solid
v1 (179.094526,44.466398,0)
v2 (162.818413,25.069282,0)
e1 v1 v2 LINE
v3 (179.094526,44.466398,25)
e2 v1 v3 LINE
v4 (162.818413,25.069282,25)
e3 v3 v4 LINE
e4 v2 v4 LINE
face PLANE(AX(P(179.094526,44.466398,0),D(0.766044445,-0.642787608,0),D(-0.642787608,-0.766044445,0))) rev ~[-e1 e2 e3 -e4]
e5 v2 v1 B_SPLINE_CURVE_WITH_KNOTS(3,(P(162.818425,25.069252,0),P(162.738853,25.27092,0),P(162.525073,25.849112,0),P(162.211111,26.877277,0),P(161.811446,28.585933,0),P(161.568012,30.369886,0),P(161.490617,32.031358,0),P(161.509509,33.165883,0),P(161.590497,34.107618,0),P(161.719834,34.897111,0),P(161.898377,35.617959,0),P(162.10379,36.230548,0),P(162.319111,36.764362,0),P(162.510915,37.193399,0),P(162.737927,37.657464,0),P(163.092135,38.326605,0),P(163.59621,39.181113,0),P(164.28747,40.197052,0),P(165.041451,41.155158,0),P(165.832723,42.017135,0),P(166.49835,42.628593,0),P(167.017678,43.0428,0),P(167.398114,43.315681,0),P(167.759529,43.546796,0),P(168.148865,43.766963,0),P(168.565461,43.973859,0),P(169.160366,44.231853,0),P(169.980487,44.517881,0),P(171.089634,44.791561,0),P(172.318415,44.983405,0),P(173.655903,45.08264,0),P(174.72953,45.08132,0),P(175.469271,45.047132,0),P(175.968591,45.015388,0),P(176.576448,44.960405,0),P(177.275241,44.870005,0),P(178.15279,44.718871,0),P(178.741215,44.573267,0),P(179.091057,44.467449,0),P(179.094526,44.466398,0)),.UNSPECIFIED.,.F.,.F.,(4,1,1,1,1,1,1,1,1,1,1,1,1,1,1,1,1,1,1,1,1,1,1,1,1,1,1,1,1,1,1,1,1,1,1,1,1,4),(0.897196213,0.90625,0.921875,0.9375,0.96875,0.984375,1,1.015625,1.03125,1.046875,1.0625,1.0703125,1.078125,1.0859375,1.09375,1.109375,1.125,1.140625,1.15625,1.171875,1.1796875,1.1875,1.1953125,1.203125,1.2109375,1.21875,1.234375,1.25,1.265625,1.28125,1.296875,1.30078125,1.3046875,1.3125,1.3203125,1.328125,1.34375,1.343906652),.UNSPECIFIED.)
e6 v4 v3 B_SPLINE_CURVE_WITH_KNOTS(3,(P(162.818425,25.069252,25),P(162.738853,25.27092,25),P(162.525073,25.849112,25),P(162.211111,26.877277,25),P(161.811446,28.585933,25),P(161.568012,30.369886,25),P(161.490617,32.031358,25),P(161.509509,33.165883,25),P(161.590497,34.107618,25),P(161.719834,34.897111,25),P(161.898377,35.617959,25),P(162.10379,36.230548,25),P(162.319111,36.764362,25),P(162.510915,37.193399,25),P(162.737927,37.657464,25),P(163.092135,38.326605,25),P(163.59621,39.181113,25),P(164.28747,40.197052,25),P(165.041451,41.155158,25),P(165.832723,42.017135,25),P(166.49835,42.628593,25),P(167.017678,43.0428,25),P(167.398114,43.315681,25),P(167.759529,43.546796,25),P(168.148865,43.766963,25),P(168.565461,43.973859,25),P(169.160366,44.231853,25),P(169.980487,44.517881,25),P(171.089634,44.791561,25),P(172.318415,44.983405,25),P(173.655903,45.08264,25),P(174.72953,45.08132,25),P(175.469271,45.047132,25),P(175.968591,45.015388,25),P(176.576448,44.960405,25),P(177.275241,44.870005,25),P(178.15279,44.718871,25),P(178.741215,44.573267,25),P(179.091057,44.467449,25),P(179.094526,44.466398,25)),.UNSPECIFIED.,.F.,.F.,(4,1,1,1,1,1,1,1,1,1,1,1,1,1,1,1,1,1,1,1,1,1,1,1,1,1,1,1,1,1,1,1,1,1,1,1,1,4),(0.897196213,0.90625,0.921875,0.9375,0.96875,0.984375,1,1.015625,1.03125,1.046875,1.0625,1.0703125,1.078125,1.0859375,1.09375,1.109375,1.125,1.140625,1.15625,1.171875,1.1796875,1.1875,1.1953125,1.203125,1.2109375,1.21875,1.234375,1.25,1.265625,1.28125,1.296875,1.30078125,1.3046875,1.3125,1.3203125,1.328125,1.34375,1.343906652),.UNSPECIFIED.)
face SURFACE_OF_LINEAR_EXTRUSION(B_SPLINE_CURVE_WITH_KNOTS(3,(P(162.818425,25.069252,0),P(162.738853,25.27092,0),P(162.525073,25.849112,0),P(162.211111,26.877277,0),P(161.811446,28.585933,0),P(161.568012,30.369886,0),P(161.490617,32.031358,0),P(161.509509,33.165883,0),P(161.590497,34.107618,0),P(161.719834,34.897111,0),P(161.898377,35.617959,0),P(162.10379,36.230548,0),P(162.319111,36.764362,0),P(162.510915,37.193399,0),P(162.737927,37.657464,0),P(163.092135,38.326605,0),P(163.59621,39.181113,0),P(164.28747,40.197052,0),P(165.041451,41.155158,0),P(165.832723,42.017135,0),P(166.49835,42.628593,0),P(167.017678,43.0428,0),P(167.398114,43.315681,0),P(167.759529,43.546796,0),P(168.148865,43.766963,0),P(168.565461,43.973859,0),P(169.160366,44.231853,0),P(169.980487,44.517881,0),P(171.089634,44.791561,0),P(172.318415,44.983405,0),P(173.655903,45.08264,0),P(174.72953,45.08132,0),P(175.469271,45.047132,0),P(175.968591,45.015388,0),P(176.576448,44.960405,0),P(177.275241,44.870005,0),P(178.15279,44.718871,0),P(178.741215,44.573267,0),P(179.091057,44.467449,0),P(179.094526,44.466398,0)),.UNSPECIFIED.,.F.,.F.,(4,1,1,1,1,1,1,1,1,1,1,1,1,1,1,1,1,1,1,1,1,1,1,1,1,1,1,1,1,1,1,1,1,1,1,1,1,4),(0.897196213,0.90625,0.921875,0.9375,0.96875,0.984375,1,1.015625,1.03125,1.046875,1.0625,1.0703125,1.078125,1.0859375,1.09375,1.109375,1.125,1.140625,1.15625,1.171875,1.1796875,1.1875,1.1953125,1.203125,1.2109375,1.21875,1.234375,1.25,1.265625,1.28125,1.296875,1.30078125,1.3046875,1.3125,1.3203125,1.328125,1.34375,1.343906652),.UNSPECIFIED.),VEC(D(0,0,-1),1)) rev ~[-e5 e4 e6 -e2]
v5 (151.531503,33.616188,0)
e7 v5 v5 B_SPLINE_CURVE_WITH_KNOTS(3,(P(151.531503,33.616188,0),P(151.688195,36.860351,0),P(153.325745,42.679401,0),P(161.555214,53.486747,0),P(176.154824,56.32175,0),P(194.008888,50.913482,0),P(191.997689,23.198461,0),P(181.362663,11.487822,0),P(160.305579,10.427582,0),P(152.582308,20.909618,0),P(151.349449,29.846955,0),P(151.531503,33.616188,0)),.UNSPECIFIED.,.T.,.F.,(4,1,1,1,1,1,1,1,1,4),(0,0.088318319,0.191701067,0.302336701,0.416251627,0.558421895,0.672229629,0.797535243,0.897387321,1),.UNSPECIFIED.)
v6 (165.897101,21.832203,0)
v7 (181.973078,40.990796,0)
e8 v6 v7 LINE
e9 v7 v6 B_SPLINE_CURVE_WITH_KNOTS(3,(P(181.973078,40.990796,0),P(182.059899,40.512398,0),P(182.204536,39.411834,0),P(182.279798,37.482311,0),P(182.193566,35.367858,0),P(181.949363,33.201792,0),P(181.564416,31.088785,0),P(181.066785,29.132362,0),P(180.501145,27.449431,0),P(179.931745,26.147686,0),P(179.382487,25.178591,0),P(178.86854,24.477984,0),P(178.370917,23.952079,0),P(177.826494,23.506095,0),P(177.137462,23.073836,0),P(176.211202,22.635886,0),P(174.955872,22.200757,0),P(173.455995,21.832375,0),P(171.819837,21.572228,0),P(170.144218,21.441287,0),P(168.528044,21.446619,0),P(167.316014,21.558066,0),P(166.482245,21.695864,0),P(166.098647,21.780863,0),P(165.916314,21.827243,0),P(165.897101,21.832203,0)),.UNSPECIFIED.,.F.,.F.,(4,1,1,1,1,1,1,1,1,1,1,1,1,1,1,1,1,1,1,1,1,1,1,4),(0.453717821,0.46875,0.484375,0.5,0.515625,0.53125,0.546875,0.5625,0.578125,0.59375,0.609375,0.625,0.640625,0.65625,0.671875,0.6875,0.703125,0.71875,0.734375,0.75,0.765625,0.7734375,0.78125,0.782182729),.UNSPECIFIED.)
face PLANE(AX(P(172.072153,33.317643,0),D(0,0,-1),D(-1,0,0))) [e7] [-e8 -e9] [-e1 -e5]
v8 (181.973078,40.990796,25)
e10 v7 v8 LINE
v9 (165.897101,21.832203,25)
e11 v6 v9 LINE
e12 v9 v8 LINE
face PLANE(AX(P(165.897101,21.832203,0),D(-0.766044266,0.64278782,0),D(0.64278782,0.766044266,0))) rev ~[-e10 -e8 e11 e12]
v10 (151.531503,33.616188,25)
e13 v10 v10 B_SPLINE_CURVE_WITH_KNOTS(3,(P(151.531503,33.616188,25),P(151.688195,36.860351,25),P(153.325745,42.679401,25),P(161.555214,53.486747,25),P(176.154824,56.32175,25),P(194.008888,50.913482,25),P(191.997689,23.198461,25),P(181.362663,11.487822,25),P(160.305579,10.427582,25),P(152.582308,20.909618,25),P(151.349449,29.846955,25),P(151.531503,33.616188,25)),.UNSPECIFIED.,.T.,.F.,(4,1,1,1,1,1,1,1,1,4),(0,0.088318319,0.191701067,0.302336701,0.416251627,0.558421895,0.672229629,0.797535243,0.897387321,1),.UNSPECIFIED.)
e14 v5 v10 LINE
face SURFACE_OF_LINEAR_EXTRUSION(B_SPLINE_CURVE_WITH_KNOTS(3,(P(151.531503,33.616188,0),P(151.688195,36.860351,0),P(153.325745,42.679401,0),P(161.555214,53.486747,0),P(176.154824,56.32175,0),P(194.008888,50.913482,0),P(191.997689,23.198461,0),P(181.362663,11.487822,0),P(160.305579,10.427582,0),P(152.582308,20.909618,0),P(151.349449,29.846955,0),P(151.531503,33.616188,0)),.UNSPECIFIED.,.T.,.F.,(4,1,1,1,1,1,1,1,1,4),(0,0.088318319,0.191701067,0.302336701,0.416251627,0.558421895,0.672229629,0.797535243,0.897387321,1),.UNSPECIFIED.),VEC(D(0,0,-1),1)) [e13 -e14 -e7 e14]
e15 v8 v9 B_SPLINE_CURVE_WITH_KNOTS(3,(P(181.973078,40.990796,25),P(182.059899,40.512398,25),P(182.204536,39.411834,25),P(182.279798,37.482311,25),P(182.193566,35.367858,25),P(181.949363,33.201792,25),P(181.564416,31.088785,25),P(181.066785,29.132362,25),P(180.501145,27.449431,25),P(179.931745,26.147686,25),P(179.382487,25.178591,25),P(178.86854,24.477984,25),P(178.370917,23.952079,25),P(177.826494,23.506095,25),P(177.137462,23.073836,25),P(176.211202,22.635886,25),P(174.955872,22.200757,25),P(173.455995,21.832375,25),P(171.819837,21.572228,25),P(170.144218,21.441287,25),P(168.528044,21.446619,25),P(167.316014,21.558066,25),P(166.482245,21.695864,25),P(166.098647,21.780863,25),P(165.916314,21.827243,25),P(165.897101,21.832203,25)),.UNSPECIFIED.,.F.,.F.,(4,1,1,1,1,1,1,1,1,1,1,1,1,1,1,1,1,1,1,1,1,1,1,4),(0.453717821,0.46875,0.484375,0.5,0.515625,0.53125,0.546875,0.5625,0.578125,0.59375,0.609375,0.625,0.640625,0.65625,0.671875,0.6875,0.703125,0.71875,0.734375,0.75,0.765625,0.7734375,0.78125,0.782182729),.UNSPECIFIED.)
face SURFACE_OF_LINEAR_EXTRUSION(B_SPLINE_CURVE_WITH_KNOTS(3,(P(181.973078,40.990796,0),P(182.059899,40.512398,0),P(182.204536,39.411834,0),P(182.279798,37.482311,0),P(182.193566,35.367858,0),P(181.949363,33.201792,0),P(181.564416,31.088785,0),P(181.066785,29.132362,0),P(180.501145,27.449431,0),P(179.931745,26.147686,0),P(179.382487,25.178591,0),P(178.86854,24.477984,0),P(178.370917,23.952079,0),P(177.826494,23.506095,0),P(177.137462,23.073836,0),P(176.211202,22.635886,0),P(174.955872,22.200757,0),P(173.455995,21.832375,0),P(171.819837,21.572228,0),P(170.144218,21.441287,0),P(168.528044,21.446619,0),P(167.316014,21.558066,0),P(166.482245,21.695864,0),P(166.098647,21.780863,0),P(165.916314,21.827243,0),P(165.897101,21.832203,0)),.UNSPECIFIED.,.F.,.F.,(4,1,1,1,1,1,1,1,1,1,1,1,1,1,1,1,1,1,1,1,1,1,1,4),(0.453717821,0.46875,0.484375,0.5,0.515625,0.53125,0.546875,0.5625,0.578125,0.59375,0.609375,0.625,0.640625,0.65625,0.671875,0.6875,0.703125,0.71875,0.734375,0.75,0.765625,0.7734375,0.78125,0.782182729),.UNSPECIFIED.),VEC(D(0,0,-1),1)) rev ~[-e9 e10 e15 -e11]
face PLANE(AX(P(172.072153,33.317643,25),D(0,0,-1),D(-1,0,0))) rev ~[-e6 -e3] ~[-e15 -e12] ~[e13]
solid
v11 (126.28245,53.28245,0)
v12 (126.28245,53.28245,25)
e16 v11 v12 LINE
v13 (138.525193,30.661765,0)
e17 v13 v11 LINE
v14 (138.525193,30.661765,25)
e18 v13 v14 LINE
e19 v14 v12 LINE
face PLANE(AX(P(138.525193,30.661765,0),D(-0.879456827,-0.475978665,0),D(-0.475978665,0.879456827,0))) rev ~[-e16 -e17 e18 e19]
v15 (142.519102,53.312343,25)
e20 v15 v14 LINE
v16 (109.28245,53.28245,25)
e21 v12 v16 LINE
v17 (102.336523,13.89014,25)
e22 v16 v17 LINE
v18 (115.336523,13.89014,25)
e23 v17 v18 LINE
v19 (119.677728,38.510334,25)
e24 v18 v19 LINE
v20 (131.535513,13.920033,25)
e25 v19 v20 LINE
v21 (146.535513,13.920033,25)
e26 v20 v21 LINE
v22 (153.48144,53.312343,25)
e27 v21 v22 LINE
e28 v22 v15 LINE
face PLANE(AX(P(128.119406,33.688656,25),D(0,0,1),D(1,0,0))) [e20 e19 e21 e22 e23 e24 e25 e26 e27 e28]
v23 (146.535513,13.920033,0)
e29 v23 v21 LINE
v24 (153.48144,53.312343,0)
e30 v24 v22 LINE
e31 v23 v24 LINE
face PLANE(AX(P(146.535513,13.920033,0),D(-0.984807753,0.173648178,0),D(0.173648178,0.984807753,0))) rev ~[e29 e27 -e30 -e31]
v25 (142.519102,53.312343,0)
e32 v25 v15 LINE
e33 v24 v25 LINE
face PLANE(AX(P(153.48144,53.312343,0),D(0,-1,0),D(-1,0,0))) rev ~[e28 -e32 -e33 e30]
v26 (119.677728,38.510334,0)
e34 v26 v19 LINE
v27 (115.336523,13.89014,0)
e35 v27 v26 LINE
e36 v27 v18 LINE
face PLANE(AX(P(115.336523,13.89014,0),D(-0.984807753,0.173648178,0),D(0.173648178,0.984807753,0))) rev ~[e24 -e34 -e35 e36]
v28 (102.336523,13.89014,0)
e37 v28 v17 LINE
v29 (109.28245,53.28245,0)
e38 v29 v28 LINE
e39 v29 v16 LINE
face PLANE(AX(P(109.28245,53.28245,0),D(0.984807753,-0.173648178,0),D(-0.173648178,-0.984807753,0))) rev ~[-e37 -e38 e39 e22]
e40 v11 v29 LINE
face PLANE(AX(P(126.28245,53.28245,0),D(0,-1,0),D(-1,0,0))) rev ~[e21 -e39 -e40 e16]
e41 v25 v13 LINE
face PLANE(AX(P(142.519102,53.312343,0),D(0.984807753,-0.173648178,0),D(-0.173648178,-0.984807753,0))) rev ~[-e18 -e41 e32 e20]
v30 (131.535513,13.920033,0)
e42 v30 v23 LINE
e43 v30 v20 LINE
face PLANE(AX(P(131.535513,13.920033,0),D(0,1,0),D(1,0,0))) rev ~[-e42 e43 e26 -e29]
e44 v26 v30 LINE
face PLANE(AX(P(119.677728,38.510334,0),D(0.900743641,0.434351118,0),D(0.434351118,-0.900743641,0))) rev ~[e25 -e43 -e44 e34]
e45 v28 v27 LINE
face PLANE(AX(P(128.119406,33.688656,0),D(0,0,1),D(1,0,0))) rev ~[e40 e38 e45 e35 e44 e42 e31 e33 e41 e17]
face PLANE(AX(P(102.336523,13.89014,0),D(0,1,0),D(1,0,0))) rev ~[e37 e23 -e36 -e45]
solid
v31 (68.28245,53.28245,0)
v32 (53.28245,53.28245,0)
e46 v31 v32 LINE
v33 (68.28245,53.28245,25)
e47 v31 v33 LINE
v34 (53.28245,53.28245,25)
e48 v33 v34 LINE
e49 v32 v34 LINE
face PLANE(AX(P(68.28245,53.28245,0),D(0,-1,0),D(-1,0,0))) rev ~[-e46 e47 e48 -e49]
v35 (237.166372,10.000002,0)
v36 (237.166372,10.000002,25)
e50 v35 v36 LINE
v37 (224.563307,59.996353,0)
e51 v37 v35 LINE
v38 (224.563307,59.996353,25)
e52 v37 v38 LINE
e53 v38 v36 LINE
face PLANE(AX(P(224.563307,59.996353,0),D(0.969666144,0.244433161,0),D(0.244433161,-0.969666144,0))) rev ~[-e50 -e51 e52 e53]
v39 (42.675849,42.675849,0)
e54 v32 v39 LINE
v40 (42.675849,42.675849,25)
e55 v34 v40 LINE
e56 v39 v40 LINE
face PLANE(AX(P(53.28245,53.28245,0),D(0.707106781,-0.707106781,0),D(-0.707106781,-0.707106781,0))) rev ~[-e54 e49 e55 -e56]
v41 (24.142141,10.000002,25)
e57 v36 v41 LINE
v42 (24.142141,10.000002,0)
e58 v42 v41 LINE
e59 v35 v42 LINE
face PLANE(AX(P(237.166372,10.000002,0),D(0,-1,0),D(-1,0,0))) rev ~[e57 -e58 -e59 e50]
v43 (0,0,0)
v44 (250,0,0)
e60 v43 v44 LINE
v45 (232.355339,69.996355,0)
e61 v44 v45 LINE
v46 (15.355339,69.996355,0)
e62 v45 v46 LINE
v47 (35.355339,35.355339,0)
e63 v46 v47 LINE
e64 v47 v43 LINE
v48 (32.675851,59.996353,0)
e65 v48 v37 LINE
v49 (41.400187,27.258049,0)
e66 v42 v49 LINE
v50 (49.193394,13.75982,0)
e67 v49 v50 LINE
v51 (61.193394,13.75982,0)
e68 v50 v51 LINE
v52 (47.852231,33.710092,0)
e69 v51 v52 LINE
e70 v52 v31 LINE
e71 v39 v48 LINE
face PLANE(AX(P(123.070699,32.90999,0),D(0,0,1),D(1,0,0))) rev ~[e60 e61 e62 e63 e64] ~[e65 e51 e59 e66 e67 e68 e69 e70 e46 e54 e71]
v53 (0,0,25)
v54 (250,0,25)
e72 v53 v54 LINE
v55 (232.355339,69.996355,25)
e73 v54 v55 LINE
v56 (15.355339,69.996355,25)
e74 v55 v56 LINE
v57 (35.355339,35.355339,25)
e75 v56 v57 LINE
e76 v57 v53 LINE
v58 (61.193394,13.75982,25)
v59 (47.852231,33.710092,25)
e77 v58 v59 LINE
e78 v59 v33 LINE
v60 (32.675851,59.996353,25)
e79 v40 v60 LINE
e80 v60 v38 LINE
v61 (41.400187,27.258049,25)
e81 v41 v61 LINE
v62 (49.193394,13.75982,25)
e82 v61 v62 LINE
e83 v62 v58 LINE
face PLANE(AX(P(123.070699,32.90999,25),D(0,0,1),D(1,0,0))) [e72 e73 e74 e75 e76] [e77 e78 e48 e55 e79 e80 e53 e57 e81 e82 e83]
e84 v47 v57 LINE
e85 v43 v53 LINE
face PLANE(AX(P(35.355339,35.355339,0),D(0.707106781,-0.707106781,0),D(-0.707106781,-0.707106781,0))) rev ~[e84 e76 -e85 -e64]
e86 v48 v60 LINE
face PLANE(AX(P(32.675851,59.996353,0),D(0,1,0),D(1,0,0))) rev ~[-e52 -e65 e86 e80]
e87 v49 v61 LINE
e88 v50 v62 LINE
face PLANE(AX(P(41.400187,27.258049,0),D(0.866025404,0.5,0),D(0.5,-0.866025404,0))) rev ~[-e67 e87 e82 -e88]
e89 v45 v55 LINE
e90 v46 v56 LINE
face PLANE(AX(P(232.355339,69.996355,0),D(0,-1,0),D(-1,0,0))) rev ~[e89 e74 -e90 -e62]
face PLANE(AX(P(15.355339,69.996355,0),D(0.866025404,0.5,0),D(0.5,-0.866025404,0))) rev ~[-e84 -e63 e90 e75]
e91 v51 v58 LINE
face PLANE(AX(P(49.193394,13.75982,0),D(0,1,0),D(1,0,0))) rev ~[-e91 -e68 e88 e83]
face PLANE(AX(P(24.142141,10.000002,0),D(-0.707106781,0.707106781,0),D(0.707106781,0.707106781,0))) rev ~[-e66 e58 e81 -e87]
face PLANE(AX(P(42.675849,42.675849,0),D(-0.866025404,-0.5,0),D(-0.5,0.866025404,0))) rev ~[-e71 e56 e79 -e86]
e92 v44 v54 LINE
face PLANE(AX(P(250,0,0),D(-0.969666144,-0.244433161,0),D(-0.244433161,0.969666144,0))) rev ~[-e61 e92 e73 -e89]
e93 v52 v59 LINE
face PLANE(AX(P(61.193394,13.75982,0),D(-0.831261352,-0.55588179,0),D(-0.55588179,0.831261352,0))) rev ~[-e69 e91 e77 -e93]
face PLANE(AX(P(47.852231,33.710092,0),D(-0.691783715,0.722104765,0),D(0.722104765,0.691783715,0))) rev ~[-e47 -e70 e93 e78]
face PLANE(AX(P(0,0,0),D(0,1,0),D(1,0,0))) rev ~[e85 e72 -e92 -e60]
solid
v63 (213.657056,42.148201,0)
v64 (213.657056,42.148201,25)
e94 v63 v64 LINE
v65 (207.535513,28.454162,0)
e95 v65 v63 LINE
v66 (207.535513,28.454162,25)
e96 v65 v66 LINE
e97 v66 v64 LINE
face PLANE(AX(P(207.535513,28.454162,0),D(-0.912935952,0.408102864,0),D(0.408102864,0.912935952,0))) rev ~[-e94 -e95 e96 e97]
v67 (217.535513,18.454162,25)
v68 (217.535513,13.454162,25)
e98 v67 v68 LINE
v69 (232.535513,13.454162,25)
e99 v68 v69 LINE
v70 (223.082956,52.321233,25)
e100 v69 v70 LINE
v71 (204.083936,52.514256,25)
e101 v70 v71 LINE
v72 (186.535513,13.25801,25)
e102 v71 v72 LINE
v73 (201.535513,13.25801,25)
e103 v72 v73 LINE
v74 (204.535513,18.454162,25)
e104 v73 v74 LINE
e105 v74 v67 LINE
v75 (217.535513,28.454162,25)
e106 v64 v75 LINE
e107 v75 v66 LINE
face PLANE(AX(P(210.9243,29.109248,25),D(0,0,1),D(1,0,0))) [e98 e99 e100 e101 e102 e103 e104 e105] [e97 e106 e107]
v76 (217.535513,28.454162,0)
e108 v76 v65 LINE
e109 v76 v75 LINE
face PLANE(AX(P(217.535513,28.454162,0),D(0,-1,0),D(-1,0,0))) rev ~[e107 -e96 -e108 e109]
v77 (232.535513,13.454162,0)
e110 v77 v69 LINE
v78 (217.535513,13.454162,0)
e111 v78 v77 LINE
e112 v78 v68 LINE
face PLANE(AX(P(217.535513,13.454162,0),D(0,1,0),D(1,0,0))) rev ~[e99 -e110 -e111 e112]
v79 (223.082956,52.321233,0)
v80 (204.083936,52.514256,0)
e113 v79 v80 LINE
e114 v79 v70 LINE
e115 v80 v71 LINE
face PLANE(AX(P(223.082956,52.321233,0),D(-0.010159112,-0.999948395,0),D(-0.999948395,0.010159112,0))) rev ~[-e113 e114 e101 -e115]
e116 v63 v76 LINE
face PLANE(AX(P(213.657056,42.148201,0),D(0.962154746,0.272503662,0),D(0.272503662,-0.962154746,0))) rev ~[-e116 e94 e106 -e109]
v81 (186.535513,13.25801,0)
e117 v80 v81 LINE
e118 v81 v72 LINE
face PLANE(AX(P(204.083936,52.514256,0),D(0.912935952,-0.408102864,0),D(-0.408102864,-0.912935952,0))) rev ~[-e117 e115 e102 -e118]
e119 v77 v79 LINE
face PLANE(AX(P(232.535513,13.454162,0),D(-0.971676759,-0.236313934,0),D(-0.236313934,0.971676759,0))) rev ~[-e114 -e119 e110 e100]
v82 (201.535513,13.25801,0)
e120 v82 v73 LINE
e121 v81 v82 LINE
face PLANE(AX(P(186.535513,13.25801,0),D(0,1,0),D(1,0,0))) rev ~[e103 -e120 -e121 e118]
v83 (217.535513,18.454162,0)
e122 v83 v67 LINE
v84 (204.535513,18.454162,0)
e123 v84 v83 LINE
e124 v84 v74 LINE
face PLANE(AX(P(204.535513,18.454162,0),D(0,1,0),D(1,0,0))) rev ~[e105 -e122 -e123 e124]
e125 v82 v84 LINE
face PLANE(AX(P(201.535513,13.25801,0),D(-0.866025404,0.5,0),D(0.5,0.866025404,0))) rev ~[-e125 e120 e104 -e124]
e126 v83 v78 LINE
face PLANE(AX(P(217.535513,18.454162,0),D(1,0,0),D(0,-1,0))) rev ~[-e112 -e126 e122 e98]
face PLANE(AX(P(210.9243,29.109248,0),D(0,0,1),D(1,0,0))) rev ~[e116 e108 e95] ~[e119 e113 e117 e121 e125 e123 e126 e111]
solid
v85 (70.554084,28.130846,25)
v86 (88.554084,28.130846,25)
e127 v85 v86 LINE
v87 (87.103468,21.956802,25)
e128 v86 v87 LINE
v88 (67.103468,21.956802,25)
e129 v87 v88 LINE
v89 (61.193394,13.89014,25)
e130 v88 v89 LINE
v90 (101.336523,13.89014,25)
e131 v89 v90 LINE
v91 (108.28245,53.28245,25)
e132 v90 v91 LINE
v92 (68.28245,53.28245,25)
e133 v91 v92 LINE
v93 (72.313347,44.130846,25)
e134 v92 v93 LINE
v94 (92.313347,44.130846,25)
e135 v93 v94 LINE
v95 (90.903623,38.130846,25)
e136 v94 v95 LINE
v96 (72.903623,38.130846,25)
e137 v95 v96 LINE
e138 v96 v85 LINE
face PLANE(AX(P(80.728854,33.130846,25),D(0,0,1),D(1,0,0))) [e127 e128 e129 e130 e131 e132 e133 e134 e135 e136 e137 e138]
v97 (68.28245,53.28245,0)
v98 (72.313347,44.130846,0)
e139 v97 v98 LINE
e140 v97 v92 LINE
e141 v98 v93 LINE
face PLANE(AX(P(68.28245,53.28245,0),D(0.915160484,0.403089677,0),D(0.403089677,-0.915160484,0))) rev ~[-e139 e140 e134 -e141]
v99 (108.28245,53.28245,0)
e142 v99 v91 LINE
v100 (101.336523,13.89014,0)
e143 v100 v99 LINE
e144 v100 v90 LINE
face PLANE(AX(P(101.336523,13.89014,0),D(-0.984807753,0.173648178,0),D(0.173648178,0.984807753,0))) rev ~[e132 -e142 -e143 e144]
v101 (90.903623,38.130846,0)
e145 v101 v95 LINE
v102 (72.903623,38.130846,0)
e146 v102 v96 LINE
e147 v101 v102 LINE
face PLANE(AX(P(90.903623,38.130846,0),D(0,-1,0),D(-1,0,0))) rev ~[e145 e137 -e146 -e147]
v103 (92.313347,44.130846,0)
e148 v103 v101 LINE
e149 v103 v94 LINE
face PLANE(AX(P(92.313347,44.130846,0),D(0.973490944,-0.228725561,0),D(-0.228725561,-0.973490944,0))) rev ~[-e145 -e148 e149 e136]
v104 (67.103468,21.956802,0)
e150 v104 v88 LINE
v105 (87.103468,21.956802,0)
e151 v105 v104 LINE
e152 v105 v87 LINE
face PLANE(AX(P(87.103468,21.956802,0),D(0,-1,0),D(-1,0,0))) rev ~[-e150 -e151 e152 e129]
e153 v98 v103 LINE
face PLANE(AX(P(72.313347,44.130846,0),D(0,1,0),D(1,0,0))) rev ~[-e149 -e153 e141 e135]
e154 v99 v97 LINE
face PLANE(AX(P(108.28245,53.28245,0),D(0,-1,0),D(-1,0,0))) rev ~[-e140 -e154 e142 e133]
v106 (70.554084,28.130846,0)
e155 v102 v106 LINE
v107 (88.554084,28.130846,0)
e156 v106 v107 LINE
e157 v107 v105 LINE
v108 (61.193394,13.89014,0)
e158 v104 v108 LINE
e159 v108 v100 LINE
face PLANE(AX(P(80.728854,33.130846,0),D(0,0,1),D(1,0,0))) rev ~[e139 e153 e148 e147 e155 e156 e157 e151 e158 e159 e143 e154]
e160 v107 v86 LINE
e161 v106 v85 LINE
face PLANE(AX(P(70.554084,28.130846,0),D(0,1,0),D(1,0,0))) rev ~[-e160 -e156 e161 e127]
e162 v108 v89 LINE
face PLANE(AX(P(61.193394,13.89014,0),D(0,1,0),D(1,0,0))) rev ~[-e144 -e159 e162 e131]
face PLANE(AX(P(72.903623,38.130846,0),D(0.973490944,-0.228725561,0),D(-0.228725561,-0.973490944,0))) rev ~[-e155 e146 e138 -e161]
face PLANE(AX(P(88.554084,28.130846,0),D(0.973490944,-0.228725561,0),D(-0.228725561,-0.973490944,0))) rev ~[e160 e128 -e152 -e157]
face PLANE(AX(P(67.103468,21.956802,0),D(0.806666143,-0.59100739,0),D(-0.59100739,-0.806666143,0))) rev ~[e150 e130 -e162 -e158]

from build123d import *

# Parameters (mm, degrees)
F1_DEPTH = 25


# Not quite as in the source:
# - ends of sketch curves that miss each other by under 0.0002 mm in the source are joined
# - the dataset's text gives a spline's control points without its knots; the knots are read off the source's solid
# - a feature names something its author has since deleted; it is built from what else it names


with BuildPart() as f1:
    # F0 (on Top) → F1 (new body)
    with BuildSketch(Plane.XY):
        Polygon((35.3553390593, 35.3553390593), (0, 0), (250, 0), (232.3553390593, 69.9963552107), (15.3553390593, 69.9963552107), align=None)
        Polygon((32.6758509431, 59.9963530121), (224.56330661, 59.9963530121), (237.166372237, 10.0000021986), (24.1421409317, 10.0000021986), (41.4001874912, 27.2580487582), (47.8522307846, 33.7100920516), (42.6758487445, 42.6758487445), align=None, mode=Mode.SUBTRACT)
        Polygon((53.2824504623, 53.2824504623), (42.6758487445, 42.6758487445), (47.8522307846, 33.7100920516), (68.2824504623, 53.2824504623), align=None)
        Polygon((47.8522307846, 33.7100920516), (41.4001874912, 27.2580487582), (49.1933937334, 13.7598195929), (61.1933937334, 13.7598195929), align=None)
    extrude(amount=F1_DEPTH)


with BuildPart() as f1b:
    # F0 (on Top) → F1, piece 2 (new body)
    with BuildSketch(Plane.XY):
        Polygon((88.5540837341, 28.1308456181), (90.9036234209, 38.1308456181), (72.9036234209, 38.1308456181), (70.5540837341, 28.1308456181), align=None)
        Polygon((108.2824504623, 53.2824504623), (68.2824504623, 53.2824504623), (72.313347233, 44.1308456181), (92.313347233, 44.1308456181), (90.9036234209, 38.1308456181), (88.5540837341, 28.1308456181), (87.1034676285, 21.9568017674), (67.1034676285, 21.9568017674), (61.1933937334, 13.8901403418), (101.3365233556, 13.8901403418), align=None)
    extrude(amount=F1_DEPTH)


with BuildPart() as f1c:
    # F0 (on Top) → F1, piece 3 (new body)
    with BuildSketch(Plane.XY):
        Polygon((126.2824504623, 53.2824504623), (109.2824504623, 53.2824504623), (102.3365233556, 13.8901403418), (115.3365233556, 13.8901403418), (119.6777277973, 38.5103341671), (131.5355133201, 13.9200327762), (146.5355133201, 13.9200327762), (153.4814404268, 53.3123428967), (142.5191015005, 53.3123428967), (138.5251934142, 30.6617645774), align=None)
    extrude(amount=F1_DEPTH)


with BuildPart() as f1d:
    # F0 (on Top) → F1, piece 4 (new body)
    with BuildSketch(Plane.XY):
        with BuildLine():
            add(Edge.make_bspline(
                [(151.5315026045, 33.6161878365), (151.6881953051, 36.8603511522), (153.3257449913, 42.6794005447), (161.5552143615, 53.4867465492), (176.1548241084, 56.3217499328), (194.0088877696, 50.9134823684), (191.9976885112, 23.1984608195), (181.36266293, 11.4878216907), (160.3055787763, 10.4275817806), (152.5823075504, 20.9096175793), (151.3494491195, 29.8469552222), (151.5315026045, 33.6161878365)],
                knots=[0, 0, 0, 0, 0.0883183193, 0.1917010674, 0.3023367007, 0.4162516271, 0.5584218951, 0.6722296295, 0.7975352428, 0.8973873208, 1, 1, 1, 1], degree=3))
        make_face()
        with BuildLine():
            add(Edge.make_bspline(
                [(162.8184250503, 25.0692523461), (162.7388528349, 25.2709199434), (162.5250729743, 25.8491123795), (162.2111113791, 26.8772771924), (161.811446171, 28.5859325459), (161.5680124914, 30.3698864013), (161.490617043, 32.0313577817), (161.5032118997, 32.7877081125), (161.5198585813, 33.1337514359)],
                knots=[0.8971962129, 0.8971962129, 0.8971962129, 0.8971962129, 0.90625, 0.921875, 0.9375, 0.96875, 0.984375, 1, 1, 1, 1], degree=3))
            add(Edge.make_bspline(
                [(161.5198585813, 33.1337514359), (161.5365052629, 33.4797947593), (161.5904971328, 34.1076177221), (161.7198338174, 34.8971109654), (161.8983772283, 35.617959176), (162.1037900469, 36.2305480911), (162.3191108206, 36.7643620724), (162.5109148317, 37.1933987719), (162.7379267984, 37.6574642255), (163.0921353714, 38.326605495), (163.596210236, 39.1811127594), (164.287470415, 40.1970519056), (165.0414513207, 41.1551577869), (165.8327231283, 42.017135319), (166.4983498938, 42.6285934344), (167.0176778213, 43.0428000772), (167.3981141086, 43.3156806379), (167.7595288983, 43.5467960735), (168.1488651256, 43.766963423), (168.5654607343, 43.9738592368), (169.1603655772, 44.23185257), (169.9804869671, 44.5178805652), (171.0896341478, 44.7915612101), (172.3184150489, 44.9834054828), (173.6559028444, 45.0826399089), (174.7295299917, 45.0813201083), (175.4692709806, 45.0471315589), (175.9685909899, 45.0153875781), (176.5764482855, 44.960404607), (177.2752413398, 44.8700053931), (178.152789541, 44.7188709988), (178.7412145092, 44.5732668808), (179.0910574906, 44.4674492213), (179.0945257888, 44.4663980322)],
                knots=[0, 0, 0, 0, 0.015625, 0.03125, 0.046875, 0.0625, 0.0703125, 0.078125, 0.0859375, 0.09375, 0.109375, 0.125, 0.140625, 0.15625, 0.171875, 0.1796875, 0.1875, 0.1953125, 0.203125, 0.2109375, 0.21875, 0.234375, 0.25, 0.265625, 0.28125, 0.296875, 0.30078125, 0.3046875, 0.3125, 0.3203125, 0.328125, 0.34375, 0.3439066519, 0.3439066519, 0.3439066519, 0.3439066519], degree=3))
            add(Edge.make_bspline(
                [(179.0945257888, 44.4663980322), (179.4369974189, 44.3626000224), (180.0408289592, 44.137858269), (180.6603332198, 43.8043498556), (180.954614815, 43.5775919437), (181.1038370269, 43.4315691806), (181.1895827034, 43.3310307887), (181.2538264485, 43.2395291398), (181.3046724038, 43.1550069204), (181.3582155541, 43.05569095), (181.422796919, 42.9212624239), (181.5199173994, 42.6948431225), (181.7085595453, 42.1772024114), (181.8753089955, 41.5231873988), (181.9696544415, 41.0096622148), (181.9730783847, 40.9907957298)],
                knots=[0.3439066519, 0.3439066519, 0.3439066519, 0.3439066519, 0.359375, 0.375, 0.390625, 0.3984375, 0.40625, 0.4140625, 0.41796875, 0.421875, 0.42578125, 0.4296875, 0.4375, 0.453125, 0.4537178211, 0.4537178211, 0.4537178211, 0.4537178211], degree=3))
            add(Edge.make_bspline(
                [(181.9730783847, 40.9907957298), (182.0598994005, 40.512397778), (182.2045363428, 39.41183358), (182.2797979507, 37.4823107399), (182.193566141, 35.3678582229), (181.9493626032, 33.2017921364), (181.5644163989, 31.0887847577), (181.0667847965, 29.1323622869), (180.5011449009, 27.4494312491), (179.9317447836, 26.1476864655), (179.3824865747, 25.1785905134), (178.8685398921, 24.4779841747), (178.3709172748, 23.9520794031), (177.8264944089, 23.5060953751), (177.1374617731, 23.0738355235), (176.2112022482, 22.6358864412), (174.9558716393, 22.2007569681), (173.4559950281, 21.8323747048), (171.8198374216, 21.5722282716), (170.1442177268, 21.4412866926), (168.5280439261, 21.4466193999), (167.3160139795, 21.558065936), (166.4822451641, 21.6958640201), (166.0986472535, 21.7808626756), (165.9163137021, 21.8272428827), (165.8971010414, 21.8322026836)],
                knots=[0.4537178211, 0.4537178211, 0.4537178211, 0.4537178211, 0.46875, 0.484375, 0.5, 0.515625, 0.53125, 0.546875, 0.5625, 0.578125, 0.59375, 0.609375, 0.625, 0.640625, 0.65625, 0.671875, 0.6875, 0.703125, 0.71875, 0.734375, 0.75, 0.765625, 0.7734375, 0.78125, 0.7821827292, 0.7821827292, 0.7821827292, 0.7821827292], degree=3))
            add(Edge.make_bspline(
                [(165.8971010414, 21.8322026836), (165.7553892759, 21.868785963), (165.5531970067, 21.9272567748), (165.3254056153, 22.0041417656), (165.1739060305, 22.0612615773), (165.0494707627, 22.1134592968), (164.8977695401, 22.1837784003), (164.7376634219, 22.2699020236), (164.5740601511, 22.3743238889), (164.3757102389, 22.5229923761), (164.1329229874, 22.7478764528), (163.795317607, 23.1578632169), (163.4078371213, 23.7696356085), (163.0732924198, 24.4470716455), (162.8761783378, 24.9228825776), (162.8184250503, 25.0692523461)],
                knots=[0.7821827292, 0.7821827292, 0.7821827292, 0.7821827292, 0.7890625, 0.79296875, 0.796875, 0.80078125, 0.8046875, 0.8125, 0.8203125, 0.828125, 0.84375, 0.859375, 0.875, 0.890625, 0.8971962129, 0.8971962129, 0.8971962129, 0.8971962129], degree=3))
        make_face(mode=Mode.SUBTRACT)
        with BuildLine():
            add(Edge.make_bspline(
                [(179.0945257888, 44.4663980322), (179.4369974189, 44.3626000224), (180.0408289592, 44.137858269), (180.6603332198, 43.8043498556), (180.954614815, 43.5775919437), (181.1038370269, 43.4315691806), (181.1895827034, 43.3310307887), (181.2538264485, 43.2395291398), (181.3046724038, 43.1550069204), (181.3582155541, 43.05569095), (181.422796919, 42.9212624239), (181.5199173994, 42.6948431225), (181.7085595453, 42.1772024114), (181.8753089955, 41.5231873988), (181.9696544415, 41.0096622148), (181.9730783847, 40.9907957298)],
                knots=[0.3439066519, 0.3439066519, 0.3439066519, 0.3439066519, 0.359375, 0.375, 0.390625, 0.3984375, 0.40625, 0.4140625, 0.41796875, 0.421875, 0.42578125, 0.4296875, 0.4375, 0.453125, 0.4537178211, 0.4537178211, 0.4537178211, 0.4537178211], degree=3))
            Line((179.0945257888, 44.4663980322), (162.8183697977, 25.0692305451))
            add(Edge.make_bspline(
                [(165.8971010414, 21.8322026836), (165.7553892759, 21.868785963), (165.5531970067, 21.9272567748), (165.3254056153, 22.0041417656), (165.1739060305, 22.0612615773), (165.0494707627, 22.1134592968), (164.8977695401, 22.1837784003), (164.7376634219, 22.2699020236), (164.5740601511, 22.3743238889), (164.3757102389, 22.5229923761), (164.1329229874, 22.7478764528), (163.795317607, 23.1578632169), (163.4078371213, 23.7696356085), (163.0732924198, 24.4470716455), (162.8761783378, 24.9228825776), (162.8183697977, 25.0692305451)],
                knots=[0.7821827292, 0.7821827292, 0.7821827292, 0.7821827292, 0.7890625, 0.79296875, 0.796875, 0.80078125, 0.8046875, 0.8125, 0.8203125, 0.828125, 0.84375, 0.859375, 0.875, 0.890625, 0.8971962129, 0.8971962129, 0.8971962129, 0.8971962129], degree=3))
            Line((165.8971010414, 21.8322026836), (181.9730783847, 40.9907957298))
        make_face()
    extrude(amount=F1_DEPTH)


with BuildPart() as f1e:
    # F0 (on Top) → F1, piece 5 (new body)
    with BuildSketch(Plane.XY):
        Polygon((232.5355133201, 13.4541621667), (223.0829559751, 52.321232543), (204.0839364723, 52.5142556785), (186.5355133201, 13.258009744), (201.5355133201, 13.258009744), (204.5355133201, 18.4541621667), (217.5355133201, 18.4541621667), (217.5355133201, 13.4541621667), align=None)
        Polygon((213.6570562804, 42.148201446), (217.5355133201, 28.4541621667), (207.5355133201, 28.4541621667), align=None, mode=Mode.SUBTRACT)
    extrude(amount=F1_DEPTH)


solid = Compound([f1.part, f1b.part, f1c.part, f1d.part, f1e.part])
